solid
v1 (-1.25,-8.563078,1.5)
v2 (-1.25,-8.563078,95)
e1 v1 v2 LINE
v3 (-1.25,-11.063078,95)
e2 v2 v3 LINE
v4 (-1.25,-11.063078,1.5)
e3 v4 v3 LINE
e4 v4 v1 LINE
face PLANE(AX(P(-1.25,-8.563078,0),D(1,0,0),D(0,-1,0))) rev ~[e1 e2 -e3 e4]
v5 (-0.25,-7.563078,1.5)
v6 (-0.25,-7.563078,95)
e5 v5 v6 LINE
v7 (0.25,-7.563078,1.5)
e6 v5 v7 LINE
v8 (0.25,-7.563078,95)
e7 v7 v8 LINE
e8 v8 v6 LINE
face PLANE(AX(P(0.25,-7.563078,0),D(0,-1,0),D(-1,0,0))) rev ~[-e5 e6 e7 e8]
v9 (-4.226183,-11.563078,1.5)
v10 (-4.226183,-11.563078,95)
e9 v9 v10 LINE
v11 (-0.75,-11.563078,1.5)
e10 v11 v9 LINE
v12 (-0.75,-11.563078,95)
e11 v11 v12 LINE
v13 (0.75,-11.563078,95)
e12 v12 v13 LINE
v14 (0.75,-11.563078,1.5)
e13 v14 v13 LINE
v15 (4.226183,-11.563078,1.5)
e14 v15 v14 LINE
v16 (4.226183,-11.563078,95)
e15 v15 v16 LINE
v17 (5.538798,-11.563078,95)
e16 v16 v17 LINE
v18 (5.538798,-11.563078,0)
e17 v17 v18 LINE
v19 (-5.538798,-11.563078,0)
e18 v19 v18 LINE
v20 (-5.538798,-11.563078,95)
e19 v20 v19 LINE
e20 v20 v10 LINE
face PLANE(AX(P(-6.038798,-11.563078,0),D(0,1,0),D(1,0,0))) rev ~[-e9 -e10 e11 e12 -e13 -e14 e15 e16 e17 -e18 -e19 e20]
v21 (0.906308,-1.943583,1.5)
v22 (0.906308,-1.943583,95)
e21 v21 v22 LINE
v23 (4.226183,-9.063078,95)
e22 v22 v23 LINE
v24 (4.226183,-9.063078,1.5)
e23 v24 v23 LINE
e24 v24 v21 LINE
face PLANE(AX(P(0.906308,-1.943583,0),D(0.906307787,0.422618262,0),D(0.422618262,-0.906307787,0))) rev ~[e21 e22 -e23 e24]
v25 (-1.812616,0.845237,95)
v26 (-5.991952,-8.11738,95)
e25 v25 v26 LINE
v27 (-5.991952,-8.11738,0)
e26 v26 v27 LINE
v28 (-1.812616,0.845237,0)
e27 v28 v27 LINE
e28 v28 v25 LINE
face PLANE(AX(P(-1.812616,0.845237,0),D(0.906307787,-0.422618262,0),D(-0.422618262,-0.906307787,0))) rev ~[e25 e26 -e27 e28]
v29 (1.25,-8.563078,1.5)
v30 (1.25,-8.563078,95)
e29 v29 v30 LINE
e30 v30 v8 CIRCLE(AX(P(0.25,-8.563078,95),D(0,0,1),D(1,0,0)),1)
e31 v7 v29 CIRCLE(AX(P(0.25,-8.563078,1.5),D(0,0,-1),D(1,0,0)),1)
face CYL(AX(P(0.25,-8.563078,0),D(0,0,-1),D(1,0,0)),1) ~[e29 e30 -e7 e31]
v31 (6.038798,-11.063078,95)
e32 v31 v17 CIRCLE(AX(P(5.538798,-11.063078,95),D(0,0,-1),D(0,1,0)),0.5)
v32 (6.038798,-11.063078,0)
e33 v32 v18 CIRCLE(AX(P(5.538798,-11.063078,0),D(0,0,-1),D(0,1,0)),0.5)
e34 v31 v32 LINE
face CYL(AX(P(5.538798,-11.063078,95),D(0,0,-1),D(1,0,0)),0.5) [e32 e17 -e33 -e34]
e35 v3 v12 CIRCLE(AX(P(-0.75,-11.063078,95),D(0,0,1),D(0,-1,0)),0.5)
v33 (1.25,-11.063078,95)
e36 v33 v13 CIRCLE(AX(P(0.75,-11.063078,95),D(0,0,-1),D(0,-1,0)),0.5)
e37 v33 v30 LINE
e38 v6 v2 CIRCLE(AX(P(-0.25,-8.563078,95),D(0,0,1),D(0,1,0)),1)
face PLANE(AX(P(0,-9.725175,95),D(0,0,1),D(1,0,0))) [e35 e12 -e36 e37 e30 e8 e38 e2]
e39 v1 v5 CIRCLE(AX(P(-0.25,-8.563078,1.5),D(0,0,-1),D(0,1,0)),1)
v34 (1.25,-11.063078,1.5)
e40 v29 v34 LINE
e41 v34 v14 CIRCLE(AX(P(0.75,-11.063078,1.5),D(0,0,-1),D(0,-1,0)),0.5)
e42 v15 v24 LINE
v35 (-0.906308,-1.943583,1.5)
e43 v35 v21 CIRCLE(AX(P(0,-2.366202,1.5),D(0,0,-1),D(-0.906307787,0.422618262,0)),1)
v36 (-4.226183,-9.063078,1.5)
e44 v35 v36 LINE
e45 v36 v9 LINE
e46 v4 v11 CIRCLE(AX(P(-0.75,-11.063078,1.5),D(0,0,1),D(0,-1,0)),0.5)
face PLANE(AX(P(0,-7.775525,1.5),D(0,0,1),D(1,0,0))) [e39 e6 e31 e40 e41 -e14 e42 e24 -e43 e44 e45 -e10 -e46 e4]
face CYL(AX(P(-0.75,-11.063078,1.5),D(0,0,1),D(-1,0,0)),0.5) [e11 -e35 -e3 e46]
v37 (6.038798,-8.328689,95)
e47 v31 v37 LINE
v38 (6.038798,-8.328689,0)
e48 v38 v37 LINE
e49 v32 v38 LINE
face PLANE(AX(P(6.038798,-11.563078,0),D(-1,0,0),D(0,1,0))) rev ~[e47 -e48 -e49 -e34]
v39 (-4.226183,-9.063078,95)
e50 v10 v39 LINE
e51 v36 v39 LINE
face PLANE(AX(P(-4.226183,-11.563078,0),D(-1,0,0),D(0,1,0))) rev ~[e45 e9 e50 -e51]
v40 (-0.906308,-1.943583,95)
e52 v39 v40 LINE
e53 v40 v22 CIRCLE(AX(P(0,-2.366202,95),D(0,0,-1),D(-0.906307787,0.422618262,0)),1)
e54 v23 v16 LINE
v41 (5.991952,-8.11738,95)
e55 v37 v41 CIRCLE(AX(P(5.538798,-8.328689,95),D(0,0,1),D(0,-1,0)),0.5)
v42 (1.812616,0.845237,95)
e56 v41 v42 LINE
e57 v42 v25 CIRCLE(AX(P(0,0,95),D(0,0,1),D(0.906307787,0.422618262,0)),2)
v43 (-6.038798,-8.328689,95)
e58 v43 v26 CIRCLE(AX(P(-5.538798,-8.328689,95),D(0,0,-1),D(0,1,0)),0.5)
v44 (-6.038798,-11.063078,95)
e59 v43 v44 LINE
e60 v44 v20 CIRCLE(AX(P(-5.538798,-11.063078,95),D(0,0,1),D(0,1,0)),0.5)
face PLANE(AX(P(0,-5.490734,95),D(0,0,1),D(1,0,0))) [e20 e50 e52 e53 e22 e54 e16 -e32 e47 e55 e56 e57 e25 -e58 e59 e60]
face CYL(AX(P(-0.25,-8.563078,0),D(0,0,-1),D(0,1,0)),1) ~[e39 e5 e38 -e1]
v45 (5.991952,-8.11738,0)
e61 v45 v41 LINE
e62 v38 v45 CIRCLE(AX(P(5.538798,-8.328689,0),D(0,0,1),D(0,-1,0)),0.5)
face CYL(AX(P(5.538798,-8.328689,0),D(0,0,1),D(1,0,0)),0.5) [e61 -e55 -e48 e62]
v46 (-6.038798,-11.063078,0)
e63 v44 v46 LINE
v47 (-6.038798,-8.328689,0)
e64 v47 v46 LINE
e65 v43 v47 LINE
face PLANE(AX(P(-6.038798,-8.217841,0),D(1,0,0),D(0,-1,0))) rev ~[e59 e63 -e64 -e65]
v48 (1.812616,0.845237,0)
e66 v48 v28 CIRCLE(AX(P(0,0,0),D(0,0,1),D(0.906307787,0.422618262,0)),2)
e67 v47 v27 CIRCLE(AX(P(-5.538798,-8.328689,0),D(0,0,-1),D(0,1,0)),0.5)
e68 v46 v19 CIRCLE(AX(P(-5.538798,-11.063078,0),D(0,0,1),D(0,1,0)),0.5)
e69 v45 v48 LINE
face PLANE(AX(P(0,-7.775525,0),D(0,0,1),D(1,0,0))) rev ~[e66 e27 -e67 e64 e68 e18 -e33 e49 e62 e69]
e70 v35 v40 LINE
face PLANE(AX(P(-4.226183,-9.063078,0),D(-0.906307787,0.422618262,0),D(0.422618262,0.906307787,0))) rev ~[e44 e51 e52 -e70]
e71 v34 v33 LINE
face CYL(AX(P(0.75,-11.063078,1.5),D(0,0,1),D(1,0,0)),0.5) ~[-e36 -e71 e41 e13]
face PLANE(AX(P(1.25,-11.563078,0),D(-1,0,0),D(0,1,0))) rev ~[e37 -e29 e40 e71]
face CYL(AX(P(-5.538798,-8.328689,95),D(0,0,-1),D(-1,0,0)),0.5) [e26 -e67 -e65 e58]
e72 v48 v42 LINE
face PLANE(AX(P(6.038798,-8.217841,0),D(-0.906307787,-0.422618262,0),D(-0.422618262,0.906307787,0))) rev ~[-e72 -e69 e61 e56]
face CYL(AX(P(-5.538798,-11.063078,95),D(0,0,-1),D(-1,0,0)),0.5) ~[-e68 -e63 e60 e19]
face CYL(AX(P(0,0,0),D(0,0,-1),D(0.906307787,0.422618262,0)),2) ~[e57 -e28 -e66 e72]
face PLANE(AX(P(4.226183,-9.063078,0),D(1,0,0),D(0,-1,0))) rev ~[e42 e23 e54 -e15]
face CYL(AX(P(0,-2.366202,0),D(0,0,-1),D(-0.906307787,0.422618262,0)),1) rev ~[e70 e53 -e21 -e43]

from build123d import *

# Parameters (mm, degrees)
F1_DEPTH = 1.5
F2_DEPTH = 95
F3_R     = 0.5


# Not quite as in the source:
# - a feature names something its author has since deleted; it is built from what else it names


with BuildPart() as f1:
    # F0 (on Top) → F1 (new body)
    with BuildSketch(Plane.XY):
        with BuildLine():
            ThreePointArc((0.906307787, -1.9435833214), (0, -1.3662015832), (-0.906307787, -1.9435833214))
            Line((-0.906307787, -1.9435833214), (-4.2261826174, -9.0630778704))
            Line((-4.2261826174, -9.0630778704), (-4.2261826174, -11.5630778704))
            Line((-4.2261826174, -11.5630778704), (-1.25, -11.5630778704))
            Line((-1.25, -11.5630778704), (-1.25, -8.5630778704))
            ThreePointArc((-1.25, -8.5630778704), (-0.9571067812, -7.8559710892), (-0.25, -7.5630778704))
            Line((-0.25, -7.5630778704), (0.25, -7.5630778704))
            ThreePointArc((0.25, -7.5630778704), (0.9571067812, -7.8559710892), (1.25, -8.5630778704))
            Line((1.25, -8.5630778704), (1.25, -11.5630778704))
            Line((1.25, -11.5630778704), (4.2261826174, -11.5630778704))
            Line((4.2261826174, -11.5630778704), (4.2261826174, -9.0630778704))
            Line((4.2261826174, -9.0630778704), (0.906307787, -1.9435833214))
        make_face()
        with BuildLine():
            Line((-4.2261826174, -9.0630778704), (-0.906307787, -1.9435833214))
            ThreePointArc((-0.906307787, -1.9435833214), (0, -1.3662015832), (0.906307787, -1.9435833214))
            Line((0.906307787, -1.9435833214), (4.2261826174, -9.0630778704))
            Line((4.2261826174, -9.0630778704), (4.2261826174, -11.5630778704))
            Line((4.2261826174, -11.5630778704), (6.0387981915, -11.5630778704))
            Line((6.0387981915, -11.5630778704), (6.0387981915, -8.2178413469))
            Line((6.0387981915, -8.2178413469), (1.8126155741, 0.8452365235))
            ThreePointArc((1.8126155741, 0.8452365235), (0, 2), (-1.8126155741, 0.8452365235))
            Line((-1.8126155741, 0.8452365235), (-6.0387981915, -8.2178413469))
            Line((-6.0387981915, -8.2178413469), (-6.0387981915, -11.5630778704))
            Line((-6.0387981915, -11.5630778704), (-4.2261826174, -11.5630778704))
            Line((-4.2261826174, -11.5630778704), (-4.2261826174, -9.0630778704))
        make_face()
        with BuildLine():
            Line((-1.25, -8.5630778704), (-1.25, -11.5630778704))
            Line((-1.25, -11.5630778704), (1.25, -11.5630778704))
            Line((1.25, -11.5630778704), (1.25, -8.5630778704))
            ThreePointArc((1.25, -8.5630778704), (0.9571067812, -7.8559710892), (0.25, -7.5630778704))
            Line((0.25, -7.5630778704), (-0.25, -7.5630778704))
            ThreePointArc((-0.25, -7.5630778704), (-0.9571067812, -7.8559710892), (-1.25, -8.5630778704))
        make_face()
    extrude(amount=F1_DEPTH)

    # F0 (on Top) → F2 (join)
    with BuildSketch(Plane.XY):
        with BuildLine():
            Line((-4.2261826174, -9.0630778704), (-0.906307787, -1.9435833214))
            ThreePointArc((-0.906307787, -1.9435833214), (0, -1.3662015832), (0.906307787, -1.9435833214))
            Line((0.906307787, -1.9435833214), (4.2261826174, -9.0630778704))
            Line((4.2261826174, -9.0630778704), (4.2261826174, -11.5630778704))
            Line((4.2261826174, -11.5630778704), (6.0387981915, -11.5630778704))
            Line((6.0387981915, -11.5630778704), (6.0387981915, -8.2178413469))
            Line((6.0387981915, -8.2178413469), (1.8126155741, 0.8452365235))
            ThreePointArc((1.8126155741, 0.8452365235), (0, 2), (-1.8126155741, 0.8452365235))
            Line((-1.8126155741, 0.8452365235), (-6.0387981915, -8.2178413469))
            Line((-6.0387981915, -8.2178413469), (-6.0387981915, -11.5630778704))
            Line((-6.0387981915, -11.5630778704), (-4.2261826174, -11.5630778704))
            Line((-4.2261826174, -11.5630778704), (-4.2261826174, -9.0630778704))
        make_face()
        with BuildLine():
            Line((-1.25, -8.5630778704), (-1.25, -11.5630778704))
            Line((-1.25, -11.5630778704), (1.25, -11.5630778704))
            Line((1.25, -11.5630778704), (1.25, -8.5630778704))
            ThreePointArc((1.25, -8.5630778704), (0.9571067812, -7.8559710892), (0.25, -7.5630778704))
            Line((0.25, -7.5630778704), (-0.25, -7.5630778704))
            ThreePointArc((-0.25, -7.5630778704), (-0.9571067812, -7.8559710892), (-1.25, -8.5630778704))
        make_face()
    extrude(amount=F2_DEPTH)

    # F3
    f3_edges = [f1.edges().sort_by_distance(p)[0] for p in [
        (-6.038798, -8.217841, 47.5),
        (-6.038798, -11.563078, 47.5),
        (6.038798, -8.217841, 47.5),
        (6.038798, -11.563078, 47.5),
        (-1.25, -11.563078, 48.25),
        (1.25, -11.563078, 48.25),
    ]]
    fillet(f3_edges, radius=F3_R)


solid = f1.part
